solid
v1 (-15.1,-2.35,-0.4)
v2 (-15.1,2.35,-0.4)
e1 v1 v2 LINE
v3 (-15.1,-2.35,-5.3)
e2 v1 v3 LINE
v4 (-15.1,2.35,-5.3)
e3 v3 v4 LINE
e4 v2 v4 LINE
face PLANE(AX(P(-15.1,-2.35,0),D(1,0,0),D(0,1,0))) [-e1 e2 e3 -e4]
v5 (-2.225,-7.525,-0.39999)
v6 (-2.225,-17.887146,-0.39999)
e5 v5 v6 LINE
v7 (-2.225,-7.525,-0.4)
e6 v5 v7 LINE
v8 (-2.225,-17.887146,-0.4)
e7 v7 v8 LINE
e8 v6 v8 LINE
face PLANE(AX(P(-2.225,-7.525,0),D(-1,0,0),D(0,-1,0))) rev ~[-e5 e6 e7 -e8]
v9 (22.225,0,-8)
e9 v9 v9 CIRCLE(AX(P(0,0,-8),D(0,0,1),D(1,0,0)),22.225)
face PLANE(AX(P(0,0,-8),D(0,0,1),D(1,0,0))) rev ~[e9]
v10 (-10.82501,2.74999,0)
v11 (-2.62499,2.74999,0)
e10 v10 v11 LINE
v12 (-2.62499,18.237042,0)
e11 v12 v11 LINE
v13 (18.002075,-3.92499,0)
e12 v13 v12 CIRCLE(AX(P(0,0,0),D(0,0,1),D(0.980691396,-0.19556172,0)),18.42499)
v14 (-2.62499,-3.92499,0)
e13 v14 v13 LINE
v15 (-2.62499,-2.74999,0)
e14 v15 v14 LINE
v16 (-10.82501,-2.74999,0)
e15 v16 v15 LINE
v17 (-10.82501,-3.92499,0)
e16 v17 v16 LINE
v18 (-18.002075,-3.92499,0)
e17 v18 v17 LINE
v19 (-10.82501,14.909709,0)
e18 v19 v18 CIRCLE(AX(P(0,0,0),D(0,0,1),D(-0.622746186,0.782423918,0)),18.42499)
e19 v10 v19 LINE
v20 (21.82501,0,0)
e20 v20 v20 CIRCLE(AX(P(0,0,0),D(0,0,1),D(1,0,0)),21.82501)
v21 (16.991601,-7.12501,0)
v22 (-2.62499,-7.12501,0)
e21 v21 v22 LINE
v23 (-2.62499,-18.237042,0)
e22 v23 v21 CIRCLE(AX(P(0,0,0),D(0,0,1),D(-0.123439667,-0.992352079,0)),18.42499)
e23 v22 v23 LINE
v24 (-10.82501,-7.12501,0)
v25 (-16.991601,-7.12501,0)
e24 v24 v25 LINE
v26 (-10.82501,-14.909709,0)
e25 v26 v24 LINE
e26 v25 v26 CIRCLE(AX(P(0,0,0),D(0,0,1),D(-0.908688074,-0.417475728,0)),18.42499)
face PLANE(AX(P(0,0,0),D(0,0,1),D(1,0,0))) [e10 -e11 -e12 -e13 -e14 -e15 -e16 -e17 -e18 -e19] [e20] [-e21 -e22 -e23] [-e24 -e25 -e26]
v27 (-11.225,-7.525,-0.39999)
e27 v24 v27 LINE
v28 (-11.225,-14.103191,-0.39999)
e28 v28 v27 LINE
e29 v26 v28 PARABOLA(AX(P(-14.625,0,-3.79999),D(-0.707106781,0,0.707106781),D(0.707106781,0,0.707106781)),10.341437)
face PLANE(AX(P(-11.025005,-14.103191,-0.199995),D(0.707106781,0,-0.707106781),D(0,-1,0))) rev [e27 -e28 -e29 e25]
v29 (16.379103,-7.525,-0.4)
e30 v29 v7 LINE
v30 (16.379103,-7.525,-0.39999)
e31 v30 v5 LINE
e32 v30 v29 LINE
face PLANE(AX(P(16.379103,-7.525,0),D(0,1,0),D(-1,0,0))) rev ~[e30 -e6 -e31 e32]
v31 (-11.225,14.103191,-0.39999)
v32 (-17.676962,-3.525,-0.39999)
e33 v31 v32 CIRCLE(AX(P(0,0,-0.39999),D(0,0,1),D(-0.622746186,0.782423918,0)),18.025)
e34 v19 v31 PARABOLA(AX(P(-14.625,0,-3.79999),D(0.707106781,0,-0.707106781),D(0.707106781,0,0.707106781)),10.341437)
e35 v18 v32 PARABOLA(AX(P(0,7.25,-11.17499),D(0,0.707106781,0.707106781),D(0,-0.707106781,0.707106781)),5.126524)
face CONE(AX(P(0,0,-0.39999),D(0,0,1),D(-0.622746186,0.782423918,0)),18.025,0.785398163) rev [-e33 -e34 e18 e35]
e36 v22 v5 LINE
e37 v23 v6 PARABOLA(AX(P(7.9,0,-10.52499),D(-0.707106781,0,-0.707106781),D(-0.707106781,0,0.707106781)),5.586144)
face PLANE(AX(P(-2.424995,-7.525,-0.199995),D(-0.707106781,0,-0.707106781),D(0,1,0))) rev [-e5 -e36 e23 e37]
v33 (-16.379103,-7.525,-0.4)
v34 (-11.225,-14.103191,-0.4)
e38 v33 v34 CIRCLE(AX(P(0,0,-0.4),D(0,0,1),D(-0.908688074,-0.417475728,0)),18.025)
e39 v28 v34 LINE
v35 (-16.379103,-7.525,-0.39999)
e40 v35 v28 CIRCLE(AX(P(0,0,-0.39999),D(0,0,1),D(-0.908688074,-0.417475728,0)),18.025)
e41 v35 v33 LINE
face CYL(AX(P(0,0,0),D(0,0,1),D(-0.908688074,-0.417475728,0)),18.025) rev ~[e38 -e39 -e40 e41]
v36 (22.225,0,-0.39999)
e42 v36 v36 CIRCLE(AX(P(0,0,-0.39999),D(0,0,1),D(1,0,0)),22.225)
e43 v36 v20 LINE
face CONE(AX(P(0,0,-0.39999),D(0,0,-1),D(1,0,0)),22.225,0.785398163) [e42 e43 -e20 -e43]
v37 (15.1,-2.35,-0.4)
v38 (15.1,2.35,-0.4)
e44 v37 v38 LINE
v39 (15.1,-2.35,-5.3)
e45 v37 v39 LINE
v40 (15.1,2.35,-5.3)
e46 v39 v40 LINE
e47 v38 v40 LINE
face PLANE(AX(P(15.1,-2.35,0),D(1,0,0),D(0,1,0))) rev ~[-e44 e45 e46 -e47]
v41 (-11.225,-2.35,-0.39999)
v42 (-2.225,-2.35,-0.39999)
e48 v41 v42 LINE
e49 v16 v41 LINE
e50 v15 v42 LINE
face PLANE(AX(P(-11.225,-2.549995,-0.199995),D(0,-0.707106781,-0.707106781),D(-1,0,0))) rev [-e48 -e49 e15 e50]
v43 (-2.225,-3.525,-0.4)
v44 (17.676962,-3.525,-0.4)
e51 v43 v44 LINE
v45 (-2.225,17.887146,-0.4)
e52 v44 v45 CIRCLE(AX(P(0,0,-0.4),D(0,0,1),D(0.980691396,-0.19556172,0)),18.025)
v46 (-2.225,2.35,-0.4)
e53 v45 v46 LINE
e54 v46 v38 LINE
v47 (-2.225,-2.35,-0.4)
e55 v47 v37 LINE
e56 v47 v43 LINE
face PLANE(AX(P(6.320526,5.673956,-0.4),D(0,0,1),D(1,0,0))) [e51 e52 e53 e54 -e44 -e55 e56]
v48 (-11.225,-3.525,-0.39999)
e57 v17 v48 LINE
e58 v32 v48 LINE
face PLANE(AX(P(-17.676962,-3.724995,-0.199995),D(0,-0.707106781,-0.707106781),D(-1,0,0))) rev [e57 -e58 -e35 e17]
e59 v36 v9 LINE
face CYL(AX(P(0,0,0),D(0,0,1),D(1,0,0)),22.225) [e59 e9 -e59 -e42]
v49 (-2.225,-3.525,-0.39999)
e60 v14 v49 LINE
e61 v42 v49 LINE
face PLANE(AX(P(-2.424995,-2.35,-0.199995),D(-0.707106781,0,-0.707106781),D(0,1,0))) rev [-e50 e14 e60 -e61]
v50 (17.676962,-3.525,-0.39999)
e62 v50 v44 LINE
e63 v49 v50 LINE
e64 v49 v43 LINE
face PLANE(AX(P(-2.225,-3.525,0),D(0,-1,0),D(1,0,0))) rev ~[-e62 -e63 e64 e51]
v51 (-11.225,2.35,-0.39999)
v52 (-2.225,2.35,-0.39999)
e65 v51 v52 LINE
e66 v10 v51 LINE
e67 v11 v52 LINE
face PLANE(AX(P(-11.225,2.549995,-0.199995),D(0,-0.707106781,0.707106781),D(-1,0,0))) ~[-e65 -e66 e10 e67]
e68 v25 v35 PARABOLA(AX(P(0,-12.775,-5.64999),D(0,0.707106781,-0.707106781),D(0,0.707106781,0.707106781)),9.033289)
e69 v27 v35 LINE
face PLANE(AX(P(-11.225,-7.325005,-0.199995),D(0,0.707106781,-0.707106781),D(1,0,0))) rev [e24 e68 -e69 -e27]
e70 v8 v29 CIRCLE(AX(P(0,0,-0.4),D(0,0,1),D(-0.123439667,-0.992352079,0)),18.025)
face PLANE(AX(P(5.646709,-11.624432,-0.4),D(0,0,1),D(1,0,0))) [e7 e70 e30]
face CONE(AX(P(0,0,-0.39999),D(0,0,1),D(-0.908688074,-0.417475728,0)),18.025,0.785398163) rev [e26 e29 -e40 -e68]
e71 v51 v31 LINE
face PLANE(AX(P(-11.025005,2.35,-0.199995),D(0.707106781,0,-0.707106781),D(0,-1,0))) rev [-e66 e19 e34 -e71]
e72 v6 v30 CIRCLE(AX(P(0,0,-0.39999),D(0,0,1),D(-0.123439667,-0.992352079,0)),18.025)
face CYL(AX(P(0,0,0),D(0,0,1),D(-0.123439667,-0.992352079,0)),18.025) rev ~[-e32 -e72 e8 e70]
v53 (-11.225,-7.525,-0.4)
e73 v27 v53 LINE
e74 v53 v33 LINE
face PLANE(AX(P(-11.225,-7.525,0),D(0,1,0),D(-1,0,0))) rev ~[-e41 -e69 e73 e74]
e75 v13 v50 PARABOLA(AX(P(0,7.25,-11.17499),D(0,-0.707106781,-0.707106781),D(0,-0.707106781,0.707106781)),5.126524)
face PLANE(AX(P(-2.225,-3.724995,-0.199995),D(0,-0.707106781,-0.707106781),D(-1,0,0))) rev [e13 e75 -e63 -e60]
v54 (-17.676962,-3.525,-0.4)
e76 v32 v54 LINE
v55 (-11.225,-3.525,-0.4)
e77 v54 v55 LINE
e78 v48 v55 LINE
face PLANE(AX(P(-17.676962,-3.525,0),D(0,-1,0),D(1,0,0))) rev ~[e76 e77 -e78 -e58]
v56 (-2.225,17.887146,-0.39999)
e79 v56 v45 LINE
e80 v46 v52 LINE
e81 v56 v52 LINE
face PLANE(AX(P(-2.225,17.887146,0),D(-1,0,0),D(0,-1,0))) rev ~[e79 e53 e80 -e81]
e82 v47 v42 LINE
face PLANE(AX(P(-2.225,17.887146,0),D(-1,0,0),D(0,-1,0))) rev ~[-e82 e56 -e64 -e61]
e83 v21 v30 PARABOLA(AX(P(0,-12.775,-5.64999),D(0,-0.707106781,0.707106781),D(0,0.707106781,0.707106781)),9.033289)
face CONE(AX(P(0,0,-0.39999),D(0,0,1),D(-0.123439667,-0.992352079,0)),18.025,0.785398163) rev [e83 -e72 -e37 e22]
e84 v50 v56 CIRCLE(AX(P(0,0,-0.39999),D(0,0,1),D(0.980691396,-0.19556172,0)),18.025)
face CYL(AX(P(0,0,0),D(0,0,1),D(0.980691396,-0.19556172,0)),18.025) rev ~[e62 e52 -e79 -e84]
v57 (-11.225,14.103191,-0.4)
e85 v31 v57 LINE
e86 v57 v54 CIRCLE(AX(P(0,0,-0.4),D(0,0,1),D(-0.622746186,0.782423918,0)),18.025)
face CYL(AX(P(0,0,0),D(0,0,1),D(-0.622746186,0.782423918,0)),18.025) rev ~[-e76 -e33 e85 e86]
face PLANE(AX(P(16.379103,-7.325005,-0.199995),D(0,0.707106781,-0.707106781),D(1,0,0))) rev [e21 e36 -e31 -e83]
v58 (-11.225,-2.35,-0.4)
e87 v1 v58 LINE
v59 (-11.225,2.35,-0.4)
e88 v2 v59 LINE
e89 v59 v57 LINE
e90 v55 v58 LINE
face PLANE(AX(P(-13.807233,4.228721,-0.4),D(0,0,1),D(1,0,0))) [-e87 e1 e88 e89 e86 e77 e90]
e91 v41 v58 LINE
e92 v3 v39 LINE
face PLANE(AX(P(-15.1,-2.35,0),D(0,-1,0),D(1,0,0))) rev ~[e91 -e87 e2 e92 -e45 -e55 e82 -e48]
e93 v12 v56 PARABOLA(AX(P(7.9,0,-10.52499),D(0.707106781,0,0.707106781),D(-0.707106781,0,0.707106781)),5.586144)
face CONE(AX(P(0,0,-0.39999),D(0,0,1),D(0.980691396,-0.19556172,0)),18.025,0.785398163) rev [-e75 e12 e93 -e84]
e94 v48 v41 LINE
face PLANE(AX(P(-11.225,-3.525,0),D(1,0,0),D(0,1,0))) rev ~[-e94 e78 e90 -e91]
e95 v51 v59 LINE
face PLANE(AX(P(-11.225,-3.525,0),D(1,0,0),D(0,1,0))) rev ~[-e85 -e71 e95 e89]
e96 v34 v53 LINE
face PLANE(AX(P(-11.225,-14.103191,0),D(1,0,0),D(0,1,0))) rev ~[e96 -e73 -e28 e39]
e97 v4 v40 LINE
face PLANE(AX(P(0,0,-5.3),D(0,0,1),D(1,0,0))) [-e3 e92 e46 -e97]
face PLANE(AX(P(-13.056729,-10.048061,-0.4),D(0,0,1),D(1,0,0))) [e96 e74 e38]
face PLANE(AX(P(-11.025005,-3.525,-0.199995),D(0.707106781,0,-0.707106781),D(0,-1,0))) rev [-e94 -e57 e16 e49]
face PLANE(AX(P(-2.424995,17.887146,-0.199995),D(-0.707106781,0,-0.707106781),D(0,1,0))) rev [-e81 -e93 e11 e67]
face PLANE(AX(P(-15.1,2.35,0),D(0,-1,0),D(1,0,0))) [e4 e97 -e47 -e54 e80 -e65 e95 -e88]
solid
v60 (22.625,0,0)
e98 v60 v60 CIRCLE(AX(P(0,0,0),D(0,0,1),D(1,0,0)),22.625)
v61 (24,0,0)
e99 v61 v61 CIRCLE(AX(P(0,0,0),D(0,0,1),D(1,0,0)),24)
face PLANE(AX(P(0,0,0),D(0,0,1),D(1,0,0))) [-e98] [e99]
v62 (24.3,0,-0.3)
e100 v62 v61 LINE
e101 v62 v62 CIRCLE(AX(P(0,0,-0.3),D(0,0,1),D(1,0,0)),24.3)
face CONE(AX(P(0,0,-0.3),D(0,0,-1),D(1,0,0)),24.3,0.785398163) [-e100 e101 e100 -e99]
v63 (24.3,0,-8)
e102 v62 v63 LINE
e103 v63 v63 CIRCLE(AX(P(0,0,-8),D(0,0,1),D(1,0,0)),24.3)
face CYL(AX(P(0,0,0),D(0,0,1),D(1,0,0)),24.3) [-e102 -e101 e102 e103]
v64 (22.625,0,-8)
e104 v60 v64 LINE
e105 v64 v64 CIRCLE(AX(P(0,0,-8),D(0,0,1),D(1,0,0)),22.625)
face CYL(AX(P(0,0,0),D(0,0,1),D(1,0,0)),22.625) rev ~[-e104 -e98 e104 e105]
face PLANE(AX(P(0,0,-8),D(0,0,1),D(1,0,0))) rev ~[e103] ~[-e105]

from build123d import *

# Parameters (mm, degrees)
F0_R     = 22.225
F1_DEPTH = 8
F2_DEPTH = 0.4
F3_W     = 30.2
F3_H     = 4.7
F4_DEPTH = 5.3
F5_SIZE  = 0.39999
F6_R     = 24.3
F6_R_2   = 22.625
F7_DEPTH = 8
F8_SIZE  = 0.3


# Not quite as in the source:
# - a fillet or chamfer is up to 0.001 mm smaller than in the source, because OpenCascade refuses the exact size


with BuildPart() as f1:
    # F0 (on Top) → F1 (new body)
    with BuildSketch(Plane.XY):
        Circle(F0_R)
        with BuildLine():
            ThreePointArc((-11.225, -14.1031911283), (-14.1885435786, -11.1169175637), (-16.3791025395, -7.525))
            Line((-16.3791025395, -7.525), (-11.225, -7.525))
            Line((-11.225, -7.525), (-11.225, -14.1031911283))
        make_face(mode=Mode.SUBTRACT)
        with BuildLine():
            Line((-2.225, -17.8871462229), (-2.225, -7.525))
            Line((-2.225, -7.525), (16.3791025395, -7.525))
            ThreePointArc((16.3791025395, -7.525), (8.7708707242, -15.7471410656), (-2.225, -17.8871462229))
        make_face(mode=Mode.SUBTRACT)
        with BuildLine():
            ThreePointArc((-17.6769624087, -3.525), (-16.9268762145, 6.1952793817), (-11.225, 14.1031911283))
            Line((-11.225, 14.1031911283), (-11.225, -3.525))
            Line((-11.225, -3.525), (-17.6769624087, -3.525))
        make_face(mode=Mode.SUBTRACT)
        with BuildLine():
            Line((-2.225, -3.525), (-2.225, 17.8871462229))
            ThreePointArc((-2.225, 17.8871462229), (13.2026810549, 12.2715051221), (17.6769624087, -3.525))
            Line((17.6769624087, -3.525), (-2.225, -3.525))
        make_face(mode=Mode.SUBTRACT)
        with BuildLine():
            Line((-11.225, -7.525), (-16.3791025395, -7.525))
            ThreePointArc((-16.3791025395, -7.525), (-14.1885435786, -11.1169175637), (-11.225, -14.1031911283))
            Line((-11.225, -14.1031911283), (-11.225, -7.525))
        make_face()
        with BuildLine():
            Line((-11.225, -3.525), (-11.225, 14.1031911283))
            ThreePointArc((-11.225, 14.1031911283), (-16.9268762145, 6.1952793817), (-17.6769624087, -3.525))
            Line((-17.6769624087, -3.525), (-11.225, -3.525))
        make_face()
        with BuildLine():
            ThreePointArc((17.6769624087, -3.525), (13.2026810549, 12.2715051221), (-2.225, 17.8871462229))
            Line((-2.225, 17.8871462229), (-2.225, -3.525))
            Line((-2.225, -3.525), (17.6769624087, -3.525))
        make_face()
        with BuildLine():
            Line((16.3791025395, -7.525), (-2.225, -7.525))
            Line((-2.225, -7.525), (-2.225, -17.8871462229))
            ThreePointArc((-2.225, -17.8871462229), (8.7708707242, -15.7471410656), (16.3791025395, -7.525))
        make_face()
    extrude(amount=-F1_DEPTH)

    # F0 (on Top) → F2 (cut)
    with BuildSketch(Plane.XY):
        with BuildLine():
            Line((-11.225, -3.525), (-11.225, 14.1031911283))
            ThreePointArc((-11.225, 14.1031911283), (-16.9268762145, 6.1952793817), (-17.6769624087, -3.525))
            Line((-17.6769624087, -3.525), (-11.225, -3.525))
        make_face()
        with BuildLine():
            ThreePointArc((17.6769624087, -3.525), (13.2026810549, 12.2715051221), (-2.225, 17.8871462229))
            Line((-2.225, 17.8871462229), (-2.225, -3.525))
            Line((-2.225, -3.525), (17.6769624087, -3.525))
        make_face()
        with BuildLine():
            Line((16.3791025395, -7.525), (-2.225, -7.525))
            Line((-2.225, -7.525), (-2.225, -17.8871462229))
            ThreePointArc((-2.225, -17.8871462229), (8.7708707242, -15.7471410656), (16.3791025395, -7.525))
        make_face()
        with BuildLine():
            Line((-11.225, -7.525), (-16.3791025395, -7.525))
            ThreePointArc((-16.3791025395, -7.525), (-14.1885435786, -11.1169175637), (-11.225, -14.1031911283))
            Line((-11.225, -14.1031911283), (-11.225, -7.525))
        make_face()
    extrude(amount=-F2_DEPTH, mode=Mode.SUBTRACT)

    # F3 (on Top) → F4 (cut)
    with BuildSketch(Plane.XY):
        Rectangle(F3_W, F3_H)
    extrude(amount=-F4_DEPTH, mode=Mode.SUBTRACT)

    # F5 (size 0.4 in the source; OpenCascade refuses exactly that, so slightly less here)
    f5_edges = [f1.edges().sort_by_distance(p)[0] for p in [
        (-11.225, 8.226596, 0),
        (-16.926876, 6.195279, 0),
        (-14.450981, -3.525, 0),
        (-11.225, -2.9375, 0),
        (13.202681, 12.271505, 0),
        (-2.225, 10.118573, 0),
        (7.725981, -3.525, 0),
        (7.077051, -7.525, 0),
        (8.770871, -15.747141, 0),
        (-2.225, -2.9375, 0),
        (-2.225, -12.706073, 0),
        (-13.802051, -7.525, 0),
        (-14.188544, -11.116918, 0),
        (-11.225, -10.814096, 0),
        (-6.725, 2.35, 0),
        (-6.725, -2.35, 0),
        (-22.225, 0, 0),
    ]]
    chamfer(f5_edges, length=F5_SIZE)


with BuildPart() as f7:
    # F6 (on Top) → F7 (new body, through all)
    with BuildSketch(Plane.XY):
        Circle(F6_R)
        Circle(F6_R_2, mode=Mode.SUBTRACT)
    extrude(amount=-F7_DEPTH)

    # F8
    f8_edges = [f7.edges().sort_by_distance(p)[0] for p in [
        (-24.3, 0, 0),
    ]]
    chamfer(f8_edges, length=F8_SIZE)


solid = Compound([f1.part, f7.part])
